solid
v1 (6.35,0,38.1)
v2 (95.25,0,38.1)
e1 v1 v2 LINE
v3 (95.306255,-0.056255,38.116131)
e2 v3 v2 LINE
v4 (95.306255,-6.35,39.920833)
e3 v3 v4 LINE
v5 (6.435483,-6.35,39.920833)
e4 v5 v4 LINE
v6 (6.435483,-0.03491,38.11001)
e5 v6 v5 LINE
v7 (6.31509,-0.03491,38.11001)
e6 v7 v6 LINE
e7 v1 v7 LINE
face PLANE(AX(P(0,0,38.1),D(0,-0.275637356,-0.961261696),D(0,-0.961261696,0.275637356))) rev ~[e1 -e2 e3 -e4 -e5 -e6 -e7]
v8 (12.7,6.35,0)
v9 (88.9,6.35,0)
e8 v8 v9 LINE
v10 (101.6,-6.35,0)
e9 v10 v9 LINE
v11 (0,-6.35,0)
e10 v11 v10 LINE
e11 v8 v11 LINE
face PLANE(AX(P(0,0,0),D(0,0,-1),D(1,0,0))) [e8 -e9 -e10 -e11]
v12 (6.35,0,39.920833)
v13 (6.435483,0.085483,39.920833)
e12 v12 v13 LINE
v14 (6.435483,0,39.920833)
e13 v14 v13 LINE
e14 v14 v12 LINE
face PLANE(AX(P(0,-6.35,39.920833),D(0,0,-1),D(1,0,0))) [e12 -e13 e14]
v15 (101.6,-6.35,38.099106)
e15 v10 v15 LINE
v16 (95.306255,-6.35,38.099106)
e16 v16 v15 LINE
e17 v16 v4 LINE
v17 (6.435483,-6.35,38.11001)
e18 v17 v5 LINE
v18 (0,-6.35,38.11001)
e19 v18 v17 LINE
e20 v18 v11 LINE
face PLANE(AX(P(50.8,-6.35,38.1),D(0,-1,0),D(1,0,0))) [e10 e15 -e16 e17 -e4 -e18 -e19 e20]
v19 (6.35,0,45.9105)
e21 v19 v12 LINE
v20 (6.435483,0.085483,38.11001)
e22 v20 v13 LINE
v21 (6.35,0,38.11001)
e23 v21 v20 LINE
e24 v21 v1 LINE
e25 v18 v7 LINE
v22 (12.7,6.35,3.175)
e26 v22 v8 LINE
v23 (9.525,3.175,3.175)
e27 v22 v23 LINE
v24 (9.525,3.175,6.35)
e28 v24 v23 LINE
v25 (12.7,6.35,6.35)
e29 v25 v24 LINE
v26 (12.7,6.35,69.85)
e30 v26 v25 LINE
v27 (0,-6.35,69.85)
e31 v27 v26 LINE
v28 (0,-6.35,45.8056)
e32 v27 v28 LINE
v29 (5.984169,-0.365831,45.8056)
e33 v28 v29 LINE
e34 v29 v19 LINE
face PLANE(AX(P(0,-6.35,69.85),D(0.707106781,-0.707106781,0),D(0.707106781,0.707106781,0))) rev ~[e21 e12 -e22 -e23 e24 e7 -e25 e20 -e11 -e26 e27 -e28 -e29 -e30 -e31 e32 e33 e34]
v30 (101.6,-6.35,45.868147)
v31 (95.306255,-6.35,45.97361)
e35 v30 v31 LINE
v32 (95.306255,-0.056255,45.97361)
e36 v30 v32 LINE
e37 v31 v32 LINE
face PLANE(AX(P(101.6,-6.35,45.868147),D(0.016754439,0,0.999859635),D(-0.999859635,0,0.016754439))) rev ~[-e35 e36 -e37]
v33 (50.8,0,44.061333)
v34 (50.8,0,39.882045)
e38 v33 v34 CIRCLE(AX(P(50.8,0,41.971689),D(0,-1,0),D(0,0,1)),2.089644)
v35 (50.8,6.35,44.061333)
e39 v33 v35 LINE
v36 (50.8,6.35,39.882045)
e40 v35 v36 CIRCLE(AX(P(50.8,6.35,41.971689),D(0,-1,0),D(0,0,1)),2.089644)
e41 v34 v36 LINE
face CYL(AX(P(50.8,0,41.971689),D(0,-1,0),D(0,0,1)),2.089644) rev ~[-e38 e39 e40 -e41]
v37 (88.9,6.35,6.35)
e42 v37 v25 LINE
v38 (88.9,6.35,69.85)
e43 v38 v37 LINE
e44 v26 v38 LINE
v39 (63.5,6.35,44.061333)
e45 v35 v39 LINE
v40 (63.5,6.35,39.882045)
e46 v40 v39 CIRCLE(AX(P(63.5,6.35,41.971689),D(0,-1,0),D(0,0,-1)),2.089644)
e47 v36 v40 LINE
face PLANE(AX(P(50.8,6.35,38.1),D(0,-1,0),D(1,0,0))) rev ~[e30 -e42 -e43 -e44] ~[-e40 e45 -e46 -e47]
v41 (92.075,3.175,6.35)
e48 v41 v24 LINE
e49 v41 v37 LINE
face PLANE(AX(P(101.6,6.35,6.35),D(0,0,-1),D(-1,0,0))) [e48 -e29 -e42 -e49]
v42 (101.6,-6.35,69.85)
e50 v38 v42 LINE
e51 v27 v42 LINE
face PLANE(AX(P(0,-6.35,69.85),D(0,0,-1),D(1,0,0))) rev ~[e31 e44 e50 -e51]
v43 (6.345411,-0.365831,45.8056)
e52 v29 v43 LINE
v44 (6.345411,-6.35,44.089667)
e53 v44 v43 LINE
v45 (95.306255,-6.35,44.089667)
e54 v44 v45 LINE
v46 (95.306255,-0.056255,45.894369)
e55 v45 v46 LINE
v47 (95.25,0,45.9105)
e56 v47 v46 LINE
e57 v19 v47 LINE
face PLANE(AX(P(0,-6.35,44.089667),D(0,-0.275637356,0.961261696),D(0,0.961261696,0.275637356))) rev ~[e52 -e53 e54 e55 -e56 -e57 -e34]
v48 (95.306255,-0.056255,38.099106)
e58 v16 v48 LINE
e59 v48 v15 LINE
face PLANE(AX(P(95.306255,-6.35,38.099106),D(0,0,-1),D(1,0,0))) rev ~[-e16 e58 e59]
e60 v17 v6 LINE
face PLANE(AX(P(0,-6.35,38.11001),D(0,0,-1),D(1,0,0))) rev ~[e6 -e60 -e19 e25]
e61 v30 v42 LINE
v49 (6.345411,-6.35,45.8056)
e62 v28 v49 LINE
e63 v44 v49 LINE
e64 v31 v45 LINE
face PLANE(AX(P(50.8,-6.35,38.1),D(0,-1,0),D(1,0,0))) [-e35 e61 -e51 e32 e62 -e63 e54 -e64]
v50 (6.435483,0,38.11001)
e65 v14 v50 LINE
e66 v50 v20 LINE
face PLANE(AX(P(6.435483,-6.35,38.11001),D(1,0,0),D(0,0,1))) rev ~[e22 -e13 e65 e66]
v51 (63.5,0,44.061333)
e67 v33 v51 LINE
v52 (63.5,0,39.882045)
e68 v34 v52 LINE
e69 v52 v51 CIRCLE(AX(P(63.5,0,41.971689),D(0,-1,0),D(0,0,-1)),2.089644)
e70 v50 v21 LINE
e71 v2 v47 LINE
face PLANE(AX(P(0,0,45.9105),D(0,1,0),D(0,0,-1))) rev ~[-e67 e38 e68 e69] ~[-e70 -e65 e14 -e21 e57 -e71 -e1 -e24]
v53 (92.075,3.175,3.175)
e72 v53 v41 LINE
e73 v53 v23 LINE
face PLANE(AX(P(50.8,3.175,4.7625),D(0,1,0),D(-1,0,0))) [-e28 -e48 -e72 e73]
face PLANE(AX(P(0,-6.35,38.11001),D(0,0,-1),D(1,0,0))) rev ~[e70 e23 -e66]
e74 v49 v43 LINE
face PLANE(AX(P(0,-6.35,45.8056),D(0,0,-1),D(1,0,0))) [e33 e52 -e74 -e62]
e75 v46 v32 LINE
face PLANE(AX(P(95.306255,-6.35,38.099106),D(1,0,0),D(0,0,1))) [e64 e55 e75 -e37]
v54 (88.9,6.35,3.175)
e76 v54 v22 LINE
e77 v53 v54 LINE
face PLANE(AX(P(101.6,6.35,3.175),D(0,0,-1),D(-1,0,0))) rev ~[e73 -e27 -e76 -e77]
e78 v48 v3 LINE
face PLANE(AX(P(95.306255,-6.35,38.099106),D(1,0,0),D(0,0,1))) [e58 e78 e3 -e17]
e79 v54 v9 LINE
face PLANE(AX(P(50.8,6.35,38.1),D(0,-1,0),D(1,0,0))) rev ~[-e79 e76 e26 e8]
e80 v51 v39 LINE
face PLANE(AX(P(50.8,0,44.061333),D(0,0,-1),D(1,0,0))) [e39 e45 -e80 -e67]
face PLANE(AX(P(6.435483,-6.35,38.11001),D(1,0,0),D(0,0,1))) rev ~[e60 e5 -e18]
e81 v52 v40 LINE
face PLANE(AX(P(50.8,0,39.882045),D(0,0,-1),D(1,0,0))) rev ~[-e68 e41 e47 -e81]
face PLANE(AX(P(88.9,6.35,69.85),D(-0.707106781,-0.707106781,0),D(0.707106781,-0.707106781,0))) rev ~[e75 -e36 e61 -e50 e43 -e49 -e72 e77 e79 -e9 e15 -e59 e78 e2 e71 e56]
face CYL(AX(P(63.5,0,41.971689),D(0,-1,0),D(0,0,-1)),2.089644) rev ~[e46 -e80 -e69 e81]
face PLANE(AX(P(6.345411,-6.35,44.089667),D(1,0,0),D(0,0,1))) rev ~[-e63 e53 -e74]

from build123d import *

# Parameters (mm, degrees)
F1_DEPTH  = 6.35
F3_DEPTH  = 279.4
F4_W      = 101.6
F4_H      = 3.175
F5_DEPTH  = 3.175
F6_W      = 12.7
F6_H      = 4.1792877018
F7_DEPTH  = 25.4
F8_W      = 101.6
F8_H      = 6.35
F9_DEPTH  = 25.4
F11_DEPTH = 69.851
F12_W     = 6.2937450767
F12_H     = 5.9905603992
F13_DEPTH = 6.35
F14_W     = 6.4354827628
F14_H     = 1.8108228737
F15_DEPTH = 25.4
F16_W     = 6.3454108313
F16_H     = 1.71593274
F17_DEPTH = 25.4


# Not quite as in the source:
# - a feature names something its author has since deleted; it is built from what else it names


with BuildPart() as f1:
    # F0 (on Front) → F1 (new body, symmetric)
    with BuildSketch(Plane.XZ):
        Polygon((0, 38.1), (0, 0), (101.6, 0), (101.6, 76.2), (0, 76.2), align=None)
    extrude(amount=F1_DEPTH, both=True)

    # F2 (on face) → F3 (cut)
    with BuildSketch(Plane(origin=(0, 0, 0), x_dir=(0, -1, 0), z_dir=(-1, 0, 0))):
        Polygon((0, 45.9105), (0, 38.1), (6.35, 39.9208331996), (6.35, 44.0896668004), align=None)
    extrude(amount=-F3_DEPTH, mode=Mode.SUBTRACT)

    # F4 (on face) → F5 (cut)
    with BuildSketch(Plane(origin=(0, 6.35, 0), x_dir=(-1, 0, 0), z_dir=(0, 1, 0))):
        with Locations((-50.8, 4.7625)):
            Rectangle(F4_W, F4_H)
    extrude(amount=-F5_DEPTH, mode=Mode.SUBTRACT)

    # F6 (on face) → F7 (cut)
    with BuildSketch(Plane.XZ):
        with BuildLine():
            Line((50.8, 39.8820452392), (50.8, 44.0613329411))
            ThreePointArc((50.8, 44.0613329411), (48.7103561491, 41.9716890901), (50.8, 39.8820452392))
        make_face()
        with Locations((57.15, 41.9716890901)):
            Rectangle(F6_W, F6_H)
        with BuildLine():
            ThreePointArc((63.5, 39.8820452392), (65.5896438509, 41.9716890901), (63.5, 44.0613329411))
            Line((63.5, 44.0613329411), (63.5, 39.8820452392))
        make_face()
    extrude(amount=-F7_DEPTH, mode=Mode.SUBTRACT)

    # F8 (on face) → F9 (cut)
    with BuildSketch(Plane.XZ.offset(6.35)):
        with Locations((50.8, 73.025)):
            Rectangle(F8_W, F8_H)
    extrude(amount=-F9_DEPTH, mode=Mode.SUBTRACT)

    # F10 (on face) → F11 (cut, through all)
    with BuildSketch(Plane.XY.offset(69.85)):
        Polygon((0, 6.35), (0, -6.35), (12.7, 6.35), align=None)
        Polygon((88.9, 6.35), (101.6, -6.35), (101.6, 6.35), align=None)
    extrude(amount=-F11_DEPTH, mode=Mode.SUBTRACT)

    # F12 (on face) → F13 (cut)
    with BuildSketch(Plane.XZ.offset(6.35)):
        with Locations((98.4531274617, 41.0943866008)):
            Rectangle(F12_W, F12_H)
        Polygon((101.6, 45.8681471646), (95.3062549233, 45.9736101329), (95.3062549233, 44.0896668004), (101.6, 44.0896668004), align=None)
    extrude(amount=-F13_DEPTH, mode=Mode.SUBTRACT)

    # F14 (on face) → F15 (cut)
    with BuildSketch(Plane.XZ.offset(6.35)):
        with Locations((3.2177413814, 39.0154217627)):
            Rectangle(F14_W, F14_H)
    extrude(amount=-F15_DEPTH, mode=Mode.SUBTRACT)

    # F16 (on face) → F17 (cut)
    with BuildSketch(Plane.XZ.offset(6.35)):
        with Locations((3.1727054156, 44.9476331705)):
            Rectangle(F16_W, F16_H)
    extrude(amount=-F17_DEPTH, mode=Mode.SUBTRACT)


solid = f1.part
